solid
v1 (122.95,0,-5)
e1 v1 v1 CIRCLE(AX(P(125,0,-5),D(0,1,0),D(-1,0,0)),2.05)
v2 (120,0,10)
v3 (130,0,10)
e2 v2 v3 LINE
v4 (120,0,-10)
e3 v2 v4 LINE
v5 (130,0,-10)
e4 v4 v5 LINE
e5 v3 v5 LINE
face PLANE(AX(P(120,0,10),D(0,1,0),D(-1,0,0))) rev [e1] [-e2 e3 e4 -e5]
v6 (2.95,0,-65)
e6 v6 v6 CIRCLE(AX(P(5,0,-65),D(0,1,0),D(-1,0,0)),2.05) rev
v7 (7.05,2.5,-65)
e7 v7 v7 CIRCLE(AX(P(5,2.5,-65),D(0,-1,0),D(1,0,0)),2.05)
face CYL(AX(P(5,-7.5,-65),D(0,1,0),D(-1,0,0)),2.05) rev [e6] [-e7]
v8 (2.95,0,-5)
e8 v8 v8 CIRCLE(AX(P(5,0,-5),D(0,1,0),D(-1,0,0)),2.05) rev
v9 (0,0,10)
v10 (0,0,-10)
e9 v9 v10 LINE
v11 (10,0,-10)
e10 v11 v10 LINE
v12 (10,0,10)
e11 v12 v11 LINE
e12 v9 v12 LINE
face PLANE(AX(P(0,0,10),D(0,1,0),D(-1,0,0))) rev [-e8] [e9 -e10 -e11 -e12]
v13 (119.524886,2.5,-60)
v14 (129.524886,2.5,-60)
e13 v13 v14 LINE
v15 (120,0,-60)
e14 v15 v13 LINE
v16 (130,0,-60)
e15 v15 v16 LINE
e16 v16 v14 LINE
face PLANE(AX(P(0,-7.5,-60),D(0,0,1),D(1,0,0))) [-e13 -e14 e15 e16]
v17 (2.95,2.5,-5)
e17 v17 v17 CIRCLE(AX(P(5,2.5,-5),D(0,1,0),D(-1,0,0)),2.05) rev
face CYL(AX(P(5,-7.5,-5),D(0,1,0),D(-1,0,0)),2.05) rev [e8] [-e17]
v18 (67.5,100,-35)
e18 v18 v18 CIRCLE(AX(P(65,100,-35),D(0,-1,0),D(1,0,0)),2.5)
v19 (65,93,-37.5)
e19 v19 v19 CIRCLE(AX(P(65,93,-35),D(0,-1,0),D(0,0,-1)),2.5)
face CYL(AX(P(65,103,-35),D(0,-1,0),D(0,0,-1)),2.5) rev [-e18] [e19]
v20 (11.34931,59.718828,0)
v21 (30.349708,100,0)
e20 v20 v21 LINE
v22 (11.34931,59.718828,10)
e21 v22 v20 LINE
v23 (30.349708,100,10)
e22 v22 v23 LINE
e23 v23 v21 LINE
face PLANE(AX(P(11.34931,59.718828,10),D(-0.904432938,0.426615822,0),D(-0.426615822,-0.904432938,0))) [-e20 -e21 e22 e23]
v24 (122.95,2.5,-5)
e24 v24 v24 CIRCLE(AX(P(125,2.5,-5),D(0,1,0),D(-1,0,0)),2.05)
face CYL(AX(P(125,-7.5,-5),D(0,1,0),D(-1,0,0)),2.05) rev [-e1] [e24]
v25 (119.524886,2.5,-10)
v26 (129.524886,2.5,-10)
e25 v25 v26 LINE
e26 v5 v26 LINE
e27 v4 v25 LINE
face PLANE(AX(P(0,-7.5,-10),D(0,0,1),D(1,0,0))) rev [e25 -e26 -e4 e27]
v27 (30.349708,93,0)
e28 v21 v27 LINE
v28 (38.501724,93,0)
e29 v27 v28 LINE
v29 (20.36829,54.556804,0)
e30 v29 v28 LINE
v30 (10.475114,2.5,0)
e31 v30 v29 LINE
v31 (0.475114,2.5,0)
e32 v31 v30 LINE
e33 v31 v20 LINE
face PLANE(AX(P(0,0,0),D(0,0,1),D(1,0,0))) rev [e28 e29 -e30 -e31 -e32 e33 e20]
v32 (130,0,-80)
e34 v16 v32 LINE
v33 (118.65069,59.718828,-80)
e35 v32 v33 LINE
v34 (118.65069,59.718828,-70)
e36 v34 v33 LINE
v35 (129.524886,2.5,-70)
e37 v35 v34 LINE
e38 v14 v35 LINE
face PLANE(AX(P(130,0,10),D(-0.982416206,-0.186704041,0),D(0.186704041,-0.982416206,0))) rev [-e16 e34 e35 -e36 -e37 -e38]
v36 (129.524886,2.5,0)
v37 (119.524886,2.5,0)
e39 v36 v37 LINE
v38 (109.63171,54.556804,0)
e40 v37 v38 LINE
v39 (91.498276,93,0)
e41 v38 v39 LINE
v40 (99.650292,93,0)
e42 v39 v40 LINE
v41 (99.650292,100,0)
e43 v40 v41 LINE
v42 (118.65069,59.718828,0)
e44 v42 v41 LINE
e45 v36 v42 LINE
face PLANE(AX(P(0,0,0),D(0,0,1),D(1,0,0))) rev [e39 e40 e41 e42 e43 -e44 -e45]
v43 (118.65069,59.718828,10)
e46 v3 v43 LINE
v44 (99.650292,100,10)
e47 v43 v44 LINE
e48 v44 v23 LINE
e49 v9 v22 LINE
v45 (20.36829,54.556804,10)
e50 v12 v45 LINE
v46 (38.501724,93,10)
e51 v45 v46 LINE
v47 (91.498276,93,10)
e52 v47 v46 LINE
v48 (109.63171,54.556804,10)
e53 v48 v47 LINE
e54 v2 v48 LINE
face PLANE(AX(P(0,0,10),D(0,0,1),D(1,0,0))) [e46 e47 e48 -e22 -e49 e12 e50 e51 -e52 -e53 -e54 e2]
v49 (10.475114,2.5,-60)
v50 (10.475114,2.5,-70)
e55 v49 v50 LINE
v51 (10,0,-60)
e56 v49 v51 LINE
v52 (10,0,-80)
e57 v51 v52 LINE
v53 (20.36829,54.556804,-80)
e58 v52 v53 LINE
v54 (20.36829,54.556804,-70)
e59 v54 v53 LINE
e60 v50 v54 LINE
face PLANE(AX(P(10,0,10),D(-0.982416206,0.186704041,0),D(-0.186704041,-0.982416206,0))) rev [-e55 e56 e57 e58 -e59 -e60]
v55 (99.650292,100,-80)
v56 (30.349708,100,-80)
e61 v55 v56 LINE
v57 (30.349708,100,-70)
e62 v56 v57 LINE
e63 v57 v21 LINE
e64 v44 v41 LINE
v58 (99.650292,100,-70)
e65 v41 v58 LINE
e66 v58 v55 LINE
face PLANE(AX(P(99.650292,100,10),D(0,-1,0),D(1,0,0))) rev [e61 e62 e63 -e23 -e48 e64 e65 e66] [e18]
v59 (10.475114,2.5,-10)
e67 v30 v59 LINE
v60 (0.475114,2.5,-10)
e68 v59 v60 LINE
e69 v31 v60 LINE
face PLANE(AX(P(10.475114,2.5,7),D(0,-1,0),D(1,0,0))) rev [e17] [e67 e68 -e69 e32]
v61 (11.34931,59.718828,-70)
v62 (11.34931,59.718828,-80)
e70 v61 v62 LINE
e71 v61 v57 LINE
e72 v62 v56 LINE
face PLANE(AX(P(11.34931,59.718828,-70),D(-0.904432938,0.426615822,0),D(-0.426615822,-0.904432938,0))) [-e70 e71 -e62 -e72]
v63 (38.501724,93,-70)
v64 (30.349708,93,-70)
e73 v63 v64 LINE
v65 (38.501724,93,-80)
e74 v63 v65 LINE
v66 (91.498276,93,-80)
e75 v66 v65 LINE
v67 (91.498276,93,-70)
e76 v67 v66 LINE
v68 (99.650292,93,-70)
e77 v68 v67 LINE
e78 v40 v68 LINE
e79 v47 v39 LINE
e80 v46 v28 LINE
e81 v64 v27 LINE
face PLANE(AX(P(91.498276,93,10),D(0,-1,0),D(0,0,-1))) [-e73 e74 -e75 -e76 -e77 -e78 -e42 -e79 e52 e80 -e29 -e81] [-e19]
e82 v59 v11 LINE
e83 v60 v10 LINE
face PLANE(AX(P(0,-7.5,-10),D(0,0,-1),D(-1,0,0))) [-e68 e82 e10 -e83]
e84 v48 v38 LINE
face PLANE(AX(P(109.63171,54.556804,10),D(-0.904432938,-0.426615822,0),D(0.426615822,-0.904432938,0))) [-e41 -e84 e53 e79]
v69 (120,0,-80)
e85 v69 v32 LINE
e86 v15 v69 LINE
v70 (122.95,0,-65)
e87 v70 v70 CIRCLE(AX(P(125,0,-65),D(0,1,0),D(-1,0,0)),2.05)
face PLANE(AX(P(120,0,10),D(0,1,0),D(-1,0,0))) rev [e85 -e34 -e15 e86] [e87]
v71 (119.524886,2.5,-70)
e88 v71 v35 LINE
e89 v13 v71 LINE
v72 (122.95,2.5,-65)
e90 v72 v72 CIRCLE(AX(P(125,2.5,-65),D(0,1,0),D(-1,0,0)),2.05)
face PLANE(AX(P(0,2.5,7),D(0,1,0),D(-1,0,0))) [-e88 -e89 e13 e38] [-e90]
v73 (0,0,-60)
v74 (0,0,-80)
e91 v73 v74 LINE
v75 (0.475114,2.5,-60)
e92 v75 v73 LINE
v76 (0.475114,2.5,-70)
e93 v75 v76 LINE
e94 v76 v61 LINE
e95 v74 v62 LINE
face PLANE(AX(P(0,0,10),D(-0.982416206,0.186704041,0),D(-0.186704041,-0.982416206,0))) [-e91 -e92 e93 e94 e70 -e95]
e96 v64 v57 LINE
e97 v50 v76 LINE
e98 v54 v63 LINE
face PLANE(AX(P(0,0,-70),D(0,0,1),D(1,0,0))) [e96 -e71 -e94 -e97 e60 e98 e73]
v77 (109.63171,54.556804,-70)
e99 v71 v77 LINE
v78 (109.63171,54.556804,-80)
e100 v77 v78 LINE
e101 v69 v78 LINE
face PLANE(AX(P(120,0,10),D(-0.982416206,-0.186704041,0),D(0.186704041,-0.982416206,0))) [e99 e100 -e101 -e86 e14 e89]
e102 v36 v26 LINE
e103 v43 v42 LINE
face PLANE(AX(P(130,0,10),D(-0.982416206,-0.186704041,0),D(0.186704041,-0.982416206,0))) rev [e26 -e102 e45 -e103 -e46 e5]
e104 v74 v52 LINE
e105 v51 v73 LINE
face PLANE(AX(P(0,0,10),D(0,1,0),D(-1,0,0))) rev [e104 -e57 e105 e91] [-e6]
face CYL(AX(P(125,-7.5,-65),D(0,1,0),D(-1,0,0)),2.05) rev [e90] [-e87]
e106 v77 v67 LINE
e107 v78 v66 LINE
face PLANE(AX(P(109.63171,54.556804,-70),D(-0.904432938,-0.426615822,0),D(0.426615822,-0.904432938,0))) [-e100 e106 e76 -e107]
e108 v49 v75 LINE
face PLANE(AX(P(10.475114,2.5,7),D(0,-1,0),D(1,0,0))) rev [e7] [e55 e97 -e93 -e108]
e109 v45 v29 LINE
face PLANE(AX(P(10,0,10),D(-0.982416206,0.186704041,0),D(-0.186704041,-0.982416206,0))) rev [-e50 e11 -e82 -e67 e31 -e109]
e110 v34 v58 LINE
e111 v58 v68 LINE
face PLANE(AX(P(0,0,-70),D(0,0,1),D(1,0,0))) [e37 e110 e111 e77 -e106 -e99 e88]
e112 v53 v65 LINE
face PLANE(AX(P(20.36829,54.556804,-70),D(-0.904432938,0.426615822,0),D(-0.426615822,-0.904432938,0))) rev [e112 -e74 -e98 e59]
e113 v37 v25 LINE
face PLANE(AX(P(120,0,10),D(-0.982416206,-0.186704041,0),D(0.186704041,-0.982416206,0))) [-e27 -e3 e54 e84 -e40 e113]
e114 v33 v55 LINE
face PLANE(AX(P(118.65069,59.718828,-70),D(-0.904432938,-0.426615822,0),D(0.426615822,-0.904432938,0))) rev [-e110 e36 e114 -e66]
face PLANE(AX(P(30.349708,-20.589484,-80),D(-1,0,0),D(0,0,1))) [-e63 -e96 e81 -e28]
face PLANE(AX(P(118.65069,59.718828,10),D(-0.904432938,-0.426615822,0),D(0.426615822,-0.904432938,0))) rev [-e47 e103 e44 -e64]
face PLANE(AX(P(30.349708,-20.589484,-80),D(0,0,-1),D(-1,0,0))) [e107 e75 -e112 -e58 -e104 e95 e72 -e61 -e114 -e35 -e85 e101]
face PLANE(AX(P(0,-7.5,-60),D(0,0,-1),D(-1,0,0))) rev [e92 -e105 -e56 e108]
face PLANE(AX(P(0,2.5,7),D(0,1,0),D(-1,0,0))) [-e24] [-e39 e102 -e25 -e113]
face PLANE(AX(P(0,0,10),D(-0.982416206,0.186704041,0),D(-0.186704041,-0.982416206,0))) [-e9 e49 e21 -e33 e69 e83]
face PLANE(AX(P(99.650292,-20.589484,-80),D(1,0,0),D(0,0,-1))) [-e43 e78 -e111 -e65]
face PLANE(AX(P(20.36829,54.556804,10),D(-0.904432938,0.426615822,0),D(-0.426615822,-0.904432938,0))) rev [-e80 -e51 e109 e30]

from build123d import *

# Parameters (mm, degrees)
BOSS_EXTRUDE1_DEPTH    = 10
LPATTERN1_COUNT        = 2
LPATTERN1_PITCH        = 80
SKETCH2_W              = 69.30058394
SKETCH2_H              = 90
BOSS_EXTRUDE2_DEPTH    = 7
SKETCH3_R              = 2.5
CUT_EXTRUDE1_DEPTH     = 10
BOSS_EXTRUDE3_DEPTH    = 77
CUT_EXTRUDE2_START     = -2.5
CUT_EXTRUDE2_OUTLINE_W = 20.397762745
CUT_EXTRUDE2_OUTLINE_H = 50
CUT_EXTRUDE2_OUTLINE_R = 2.05
CUT_EXTRUDE2_DEPTH     = 2.5


# Read off the part's stored shape, not the designer's step: Cut-Extrude2
with BuildPart() as part:
    # Sketch1 → Boss-Extrude1 (new body)
    with BuildSketch(Plane.XY):
        Polygon((0, 0), (11.349310372, 59.718827606), (30.34970803, 100), (99.65029197, 100), (118.650689628, 59.718827606), (130, 0), (120, 0), (109.631710362, 54.556803995), (91.49827561, 93), (38.50172439, 93), (20.368289638, 54.556803995), (10, 0), align=None)
    extrude(amount=BOSS_EXTRUDE1_DEPTH)


with BuildPart() as lpattern1_1:
    # LPattern1: pattern copy
    add(part.part.moved(Location(Vector(0, 0, -1) * (1 * LPATTERN1_PITCH))))


with BuildPart() as part_1:
    add(part.part)

    add(lpattern1_1.part)  # Boss-Extrude2 merges LPattern1_1
    # Sketch2 → Boss-Extrude2 (add)
    with BuildSketch(Plane(origin=(0, 100, 0), x_dir=(1, 0, 0), z_dir=(0, 1, 0))):
        with Locations((65, 35)):
            Rectangle(SKETCH2_W, SKETCH2_H)
    extrude(amount=-BOSS_EXTRUDE2_DEPTH)

    # Sketch3 → Cut-Extrude1 (cut)
    with BuildSketch(Plane.XZ.offset(-93)):
        with Locations(Location((65, -35, 0), (0, 0, 270))):
            Circle(SKETCH3_R)
    extrude(amount=-CUT_EXTRUDE1_DEPTH, mode=Mode.SUBTRACT)

    # Sketch4 → Boss-Extrude3 (add)
    with BuildSketch(Plane.XY.offset(-70)):
        Polygon((130, 0), (129.524885584, 2.5), (119.524885584, 2.5), (120, 0), align=None)
        Polygon((0, 0), (10, 0), (10.475114416, 2.5), (0.475114416, 2.5), align=None)
    extrude(amount=BOSS_EXTRUDE3_DEPTH)

    # Cut-Extrude2 outline → Cut-Extrude2 (cut)
    with BuildSketch(Plane(origin=(0, 2.5, 0), x_dir=(1, 0, 0), z_dir=(0, 1, 0)).offset(CUT_EXTRUDE2_START)):
        with Locations((129.723766957, 35)):
            Rectangle(CUT_EXTRUDE2_OUTLINE_W, CUT_EXTRUDE2_OUTLINE_H)
        with Locations((0.276233043, 35)):
            Rectangle(CUT_EXTRUDE2_OUTLINE_W, CUT_EXTRUDE2_OUTLINE_H)
        with Locations((125, 65)):
            Circle(CUT_EXTRUDE2_OUTLINE_R)
        with Locations((125, 5)):
            Circle(CUT_EXTRUDE2_OUTLINE_R)
        with Locations((5, 5)):
            Circle(CUT_EXTRUDE2_OUTLINE_R)
        with Locations((5, 65)):
            Circle(CUT_EXTRUDE2_OUTLINE_R)
    extrude(amount=CUT_EXTRUDE2_DEPTH, mode=Mode.SUBTRACT)


solid = part_1.part
